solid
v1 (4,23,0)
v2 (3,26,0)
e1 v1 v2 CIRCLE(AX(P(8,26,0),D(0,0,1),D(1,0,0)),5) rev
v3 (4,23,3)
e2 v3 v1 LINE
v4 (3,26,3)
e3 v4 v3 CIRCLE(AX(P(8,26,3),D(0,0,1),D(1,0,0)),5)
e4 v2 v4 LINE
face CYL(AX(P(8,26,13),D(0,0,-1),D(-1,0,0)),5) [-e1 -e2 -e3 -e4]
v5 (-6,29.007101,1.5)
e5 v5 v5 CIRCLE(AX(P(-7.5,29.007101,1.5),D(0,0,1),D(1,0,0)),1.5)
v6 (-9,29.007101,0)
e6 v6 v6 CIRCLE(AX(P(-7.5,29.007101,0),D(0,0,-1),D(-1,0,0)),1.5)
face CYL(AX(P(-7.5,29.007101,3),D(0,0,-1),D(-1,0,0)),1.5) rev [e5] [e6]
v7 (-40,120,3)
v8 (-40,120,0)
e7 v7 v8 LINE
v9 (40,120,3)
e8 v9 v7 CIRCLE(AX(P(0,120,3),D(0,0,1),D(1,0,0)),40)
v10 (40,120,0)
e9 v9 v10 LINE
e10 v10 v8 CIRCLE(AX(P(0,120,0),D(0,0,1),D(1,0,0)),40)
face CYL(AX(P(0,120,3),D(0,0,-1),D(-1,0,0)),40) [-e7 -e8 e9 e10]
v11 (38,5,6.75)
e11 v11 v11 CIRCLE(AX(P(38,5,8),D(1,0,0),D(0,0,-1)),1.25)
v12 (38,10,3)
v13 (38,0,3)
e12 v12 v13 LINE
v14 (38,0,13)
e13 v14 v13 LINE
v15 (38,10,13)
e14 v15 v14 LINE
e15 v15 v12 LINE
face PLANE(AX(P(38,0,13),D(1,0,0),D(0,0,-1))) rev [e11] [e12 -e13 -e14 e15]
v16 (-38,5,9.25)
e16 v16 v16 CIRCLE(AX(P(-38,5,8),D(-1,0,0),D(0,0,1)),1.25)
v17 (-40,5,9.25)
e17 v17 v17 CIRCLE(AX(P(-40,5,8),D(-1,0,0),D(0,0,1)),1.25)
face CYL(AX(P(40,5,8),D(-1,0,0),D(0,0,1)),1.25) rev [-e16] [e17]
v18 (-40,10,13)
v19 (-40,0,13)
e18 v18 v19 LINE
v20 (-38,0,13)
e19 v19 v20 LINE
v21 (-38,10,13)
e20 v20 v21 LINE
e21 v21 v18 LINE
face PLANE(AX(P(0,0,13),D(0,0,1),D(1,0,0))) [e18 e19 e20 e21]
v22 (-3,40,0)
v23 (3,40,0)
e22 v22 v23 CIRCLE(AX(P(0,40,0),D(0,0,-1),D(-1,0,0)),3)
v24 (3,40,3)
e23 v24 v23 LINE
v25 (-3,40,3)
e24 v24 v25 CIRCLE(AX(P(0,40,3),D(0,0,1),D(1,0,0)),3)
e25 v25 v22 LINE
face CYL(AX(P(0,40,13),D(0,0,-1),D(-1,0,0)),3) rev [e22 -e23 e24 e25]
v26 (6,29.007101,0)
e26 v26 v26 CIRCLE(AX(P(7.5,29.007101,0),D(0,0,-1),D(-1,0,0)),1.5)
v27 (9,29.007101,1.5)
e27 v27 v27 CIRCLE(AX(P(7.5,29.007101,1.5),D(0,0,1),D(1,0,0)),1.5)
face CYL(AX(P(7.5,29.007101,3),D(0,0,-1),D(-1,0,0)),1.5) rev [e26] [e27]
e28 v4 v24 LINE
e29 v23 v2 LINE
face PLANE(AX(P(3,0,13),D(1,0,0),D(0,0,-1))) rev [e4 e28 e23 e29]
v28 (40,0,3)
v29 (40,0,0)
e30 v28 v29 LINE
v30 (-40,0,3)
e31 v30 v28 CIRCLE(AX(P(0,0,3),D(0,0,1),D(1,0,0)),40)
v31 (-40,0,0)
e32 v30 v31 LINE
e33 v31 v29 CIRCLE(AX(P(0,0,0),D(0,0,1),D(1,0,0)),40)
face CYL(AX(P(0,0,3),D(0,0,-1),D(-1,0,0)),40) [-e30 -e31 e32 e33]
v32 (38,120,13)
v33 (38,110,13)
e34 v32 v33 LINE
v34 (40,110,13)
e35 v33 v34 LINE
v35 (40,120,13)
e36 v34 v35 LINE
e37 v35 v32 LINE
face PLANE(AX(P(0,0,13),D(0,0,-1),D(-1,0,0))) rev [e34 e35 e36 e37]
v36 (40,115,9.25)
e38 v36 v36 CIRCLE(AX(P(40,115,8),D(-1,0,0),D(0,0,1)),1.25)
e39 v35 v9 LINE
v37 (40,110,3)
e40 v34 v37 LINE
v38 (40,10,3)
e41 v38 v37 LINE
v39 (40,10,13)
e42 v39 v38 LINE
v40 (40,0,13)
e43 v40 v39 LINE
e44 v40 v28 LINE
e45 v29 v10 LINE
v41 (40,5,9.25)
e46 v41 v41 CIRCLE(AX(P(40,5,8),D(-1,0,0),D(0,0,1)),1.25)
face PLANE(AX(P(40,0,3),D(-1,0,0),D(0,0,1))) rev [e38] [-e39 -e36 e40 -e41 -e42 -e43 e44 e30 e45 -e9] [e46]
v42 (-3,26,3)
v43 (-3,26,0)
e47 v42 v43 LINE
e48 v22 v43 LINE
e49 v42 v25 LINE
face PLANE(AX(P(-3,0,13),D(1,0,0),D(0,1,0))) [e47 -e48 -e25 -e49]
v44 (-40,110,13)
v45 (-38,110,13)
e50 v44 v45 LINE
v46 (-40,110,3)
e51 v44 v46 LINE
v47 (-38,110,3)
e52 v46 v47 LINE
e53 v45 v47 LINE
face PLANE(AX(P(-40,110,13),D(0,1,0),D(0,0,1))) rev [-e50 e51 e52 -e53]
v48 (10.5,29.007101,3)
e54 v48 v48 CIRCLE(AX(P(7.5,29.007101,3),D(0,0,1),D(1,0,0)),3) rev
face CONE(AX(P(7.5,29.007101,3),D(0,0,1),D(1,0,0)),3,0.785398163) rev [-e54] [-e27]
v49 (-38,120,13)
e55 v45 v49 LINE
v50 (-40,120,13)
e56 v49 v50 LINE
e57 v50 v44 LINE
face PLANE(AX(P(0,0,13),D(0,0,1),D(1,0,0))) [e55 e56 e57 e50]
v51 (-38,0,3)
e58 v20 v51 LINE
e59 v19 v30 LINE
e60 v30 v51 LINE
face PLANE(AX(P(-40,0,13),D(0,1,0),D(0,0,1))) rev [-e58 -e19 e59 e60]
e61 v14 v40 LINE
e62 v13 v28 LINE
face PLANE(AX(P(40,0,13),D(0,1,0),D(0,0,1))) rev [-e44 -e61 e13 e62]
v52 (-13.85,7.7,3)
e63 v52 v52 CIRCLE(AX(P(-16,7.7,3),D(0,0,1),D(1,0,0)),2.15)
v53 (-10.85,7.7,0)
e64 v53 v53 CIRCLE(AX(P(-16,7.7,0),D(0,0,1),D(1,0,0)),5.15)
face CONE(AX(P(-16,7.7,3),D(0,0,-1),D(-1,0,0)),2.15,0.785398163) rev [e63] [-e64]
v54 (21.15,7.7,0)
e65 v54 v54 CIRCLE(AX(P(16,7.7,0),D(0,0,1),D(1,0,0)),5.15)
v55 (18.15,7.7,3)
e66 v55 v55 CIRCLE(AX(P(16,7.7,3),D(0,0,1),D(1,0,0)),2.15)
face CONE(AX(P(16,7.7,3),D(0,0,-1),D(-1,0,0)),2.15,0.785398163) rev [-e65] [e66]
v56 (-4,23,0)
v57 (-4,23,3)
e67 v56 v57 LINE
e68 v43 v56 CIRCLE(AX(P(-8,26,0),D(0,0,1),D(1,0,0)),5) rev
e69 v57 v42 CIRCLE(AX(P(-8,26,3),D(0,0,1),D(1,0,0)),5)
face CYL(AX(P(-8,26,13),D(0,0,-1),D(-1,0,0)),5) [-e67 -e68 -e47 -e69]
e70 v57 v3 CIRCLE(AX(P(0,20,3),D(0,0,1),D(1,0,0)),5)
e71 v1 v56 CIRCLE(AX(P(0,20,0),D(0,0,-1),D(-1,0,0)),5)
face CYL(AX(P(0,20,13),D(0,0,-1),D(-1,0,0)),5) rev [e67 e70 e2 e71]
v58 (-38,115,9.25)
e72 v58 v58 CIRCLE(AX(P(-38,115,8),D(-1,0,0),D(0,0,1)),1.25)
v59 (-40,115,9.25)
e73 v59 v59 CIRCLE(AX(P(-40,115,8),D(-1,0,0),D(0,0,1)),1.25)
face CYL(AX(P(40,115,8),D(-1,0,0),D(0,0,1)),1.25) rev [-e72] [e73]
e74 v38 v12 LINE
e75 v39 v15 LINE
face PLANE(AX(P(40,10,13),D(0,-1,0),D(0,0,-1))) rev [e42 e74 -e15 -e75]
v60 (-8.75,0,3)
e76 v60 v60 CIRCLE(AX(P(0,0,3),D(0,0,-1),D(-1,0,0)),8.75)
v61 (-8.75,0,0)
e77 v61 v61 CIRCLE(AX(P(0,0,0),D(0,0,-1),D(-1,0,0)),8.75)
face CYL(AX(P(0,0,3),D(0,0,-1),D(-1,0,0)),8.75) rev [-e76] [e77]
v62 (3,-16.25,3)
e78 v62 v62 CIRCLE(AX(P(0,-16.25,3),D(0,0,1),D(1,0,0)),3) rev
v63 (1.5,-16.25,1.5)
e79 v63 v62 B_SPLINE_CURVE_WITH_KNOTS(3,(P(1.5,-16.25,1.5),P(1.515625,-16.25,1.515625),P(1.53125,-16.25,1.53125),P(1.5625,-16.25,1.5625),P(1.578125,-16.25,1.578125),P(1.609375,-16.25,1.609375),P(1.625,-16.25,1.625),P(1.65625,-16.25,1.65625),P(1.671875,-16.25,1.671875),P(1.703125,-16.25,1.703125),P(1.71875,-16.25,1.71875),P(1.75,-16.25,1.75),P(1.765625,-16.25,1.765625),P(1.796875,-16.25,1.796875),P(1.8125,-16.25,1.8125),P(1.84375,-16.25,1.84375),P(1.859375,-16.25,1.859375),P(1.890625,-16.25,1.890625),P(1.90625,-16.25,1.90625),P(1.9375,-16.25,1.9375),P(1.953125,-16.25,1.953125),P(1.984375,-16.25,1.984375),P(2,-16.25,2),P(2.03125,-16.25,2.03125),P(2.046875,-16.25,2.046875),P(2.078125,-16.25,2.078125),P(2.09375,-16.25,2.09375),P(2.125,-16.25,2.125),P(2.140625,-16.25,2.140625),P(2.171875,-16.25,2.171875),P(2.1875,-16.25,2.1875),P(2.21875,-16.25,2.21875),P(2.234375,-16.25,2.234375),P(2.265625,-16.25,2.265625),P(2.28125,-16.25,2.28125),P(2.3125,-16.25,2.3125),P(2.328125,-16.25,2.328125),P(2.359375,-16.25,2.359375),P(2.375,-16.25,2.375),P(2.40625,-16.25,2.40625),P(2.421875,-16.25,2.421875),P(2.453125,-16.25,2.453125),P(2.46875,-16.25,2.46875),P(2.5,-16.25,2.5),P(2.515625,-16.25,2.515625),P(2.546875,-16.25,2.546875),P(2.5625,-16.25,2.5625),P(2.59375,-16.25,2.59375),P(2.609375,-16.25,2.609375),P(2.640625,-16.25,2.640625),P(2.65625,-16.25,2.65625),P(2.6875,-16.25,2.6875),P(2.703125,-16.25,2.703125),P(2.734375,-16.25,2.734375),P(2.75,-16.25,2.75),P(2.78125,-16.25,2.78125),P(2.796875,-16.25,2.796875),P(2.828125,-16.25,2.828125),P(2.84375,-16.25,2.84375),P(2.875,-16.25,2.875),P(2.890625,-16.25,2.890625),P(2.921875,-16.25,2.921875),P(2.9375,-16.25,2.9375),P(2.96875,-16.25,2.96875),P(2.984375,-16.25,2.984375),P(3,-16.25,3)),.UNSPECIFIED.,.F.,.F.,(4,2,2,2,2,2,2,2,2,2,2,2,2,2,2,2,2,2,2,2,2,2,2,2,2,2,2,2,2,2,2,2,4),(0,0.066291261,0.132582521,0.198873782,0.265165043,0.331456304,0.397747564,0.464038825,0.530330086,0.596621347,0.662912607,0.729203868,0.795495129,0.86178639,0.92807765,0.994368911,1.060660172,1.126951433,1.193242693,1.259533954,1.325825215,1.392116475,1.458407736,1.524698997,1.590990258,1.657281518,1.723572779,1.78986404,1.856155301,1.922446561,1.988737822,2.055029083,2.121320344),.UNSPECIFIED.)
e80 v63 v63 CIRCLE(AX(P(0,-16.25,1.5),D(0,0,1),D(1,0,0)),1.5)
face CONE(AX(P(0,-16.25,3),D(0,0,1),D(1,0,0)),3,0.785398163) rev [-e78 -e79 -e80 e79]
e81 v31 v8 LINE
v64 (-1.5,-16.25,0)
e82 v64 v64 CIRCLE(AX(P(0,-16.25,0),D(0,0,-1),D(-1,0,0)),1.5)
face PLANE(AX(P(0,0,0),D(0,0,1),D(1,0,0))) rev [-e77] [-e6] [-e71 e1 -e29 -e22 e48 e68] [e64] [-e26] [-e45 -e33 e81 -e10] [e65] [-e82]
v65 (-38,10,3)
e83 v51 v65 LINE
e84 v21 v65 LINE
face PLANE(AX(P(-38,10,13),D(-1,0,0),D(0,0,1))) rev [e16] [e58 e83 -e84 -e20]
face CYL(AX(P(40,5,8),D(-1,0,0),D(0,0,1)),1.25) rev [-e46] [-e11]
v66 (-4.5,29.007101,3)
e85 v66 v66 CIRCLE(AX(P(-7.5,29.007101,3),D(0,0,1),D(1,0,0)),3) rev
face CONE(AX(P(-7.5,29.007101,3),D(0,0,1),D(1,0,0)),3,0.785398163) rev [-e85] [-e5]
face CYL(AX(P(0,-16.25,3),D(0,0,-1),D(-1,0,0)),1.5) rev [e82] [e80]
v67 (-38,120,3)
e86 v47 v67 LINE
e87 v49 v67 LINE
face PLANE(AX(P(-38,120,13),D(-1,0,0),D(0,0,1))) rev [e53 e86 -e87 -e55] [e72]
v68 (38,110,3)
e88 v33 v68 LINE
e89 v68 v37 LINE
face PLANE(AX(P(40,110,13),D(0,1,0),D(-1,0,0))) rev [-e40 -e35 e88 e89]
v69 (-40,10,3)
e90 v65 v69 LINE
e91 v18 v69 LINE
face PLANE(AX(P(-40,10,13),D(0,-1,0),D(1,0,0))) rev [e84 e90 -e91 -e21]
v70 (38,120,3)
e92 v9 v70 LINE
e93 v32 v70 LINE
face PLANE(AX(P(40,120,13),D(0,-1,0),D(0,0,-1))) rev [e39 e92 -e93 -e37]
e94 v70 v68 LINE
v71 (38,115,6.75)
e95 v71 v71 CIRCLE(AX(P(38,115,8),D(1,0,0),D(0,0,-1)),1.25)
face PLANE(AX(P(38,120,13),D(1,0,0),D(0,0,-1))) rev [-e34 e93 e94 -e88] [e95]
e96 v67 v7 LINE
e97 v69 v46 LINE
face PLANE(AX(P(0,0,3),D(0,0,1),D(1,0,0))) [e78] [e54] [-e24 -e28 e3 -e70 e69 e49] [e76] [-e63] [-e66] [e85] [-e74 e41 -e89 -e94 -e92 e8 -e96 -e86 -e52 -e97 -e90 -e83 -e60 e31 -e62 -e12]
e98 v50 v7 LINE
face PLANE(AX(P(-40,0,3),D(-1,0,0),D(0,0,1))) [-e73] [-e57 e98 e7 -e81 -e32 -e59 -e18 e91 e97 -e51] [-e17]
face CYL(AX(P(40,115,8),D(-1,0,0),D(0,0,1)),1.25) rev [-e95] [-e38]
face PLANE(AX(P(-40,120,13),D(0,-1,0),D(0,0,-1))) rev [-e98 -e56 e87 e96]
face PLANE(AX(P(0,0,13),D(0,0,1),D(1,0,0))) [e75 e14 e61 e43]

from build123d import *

# Parameters (mm, degrees)
SKETCH3_R           = 40
BOSS_EXTRUDE4_DEPTH = 3
SKETCH6_R           = 1.5
SKETCH6_R_2         = 8.75
CUT_EXTRUDE2_DEPTH  = 165.951508026
CHAMFER1_SIZE       = 1.5
SKETCH12_W          = 2
SKETCH12_H          = 10
BOSS_EXTRUDE7_DEPTH = 10
SKETCH13_R          = 1.25
CUT_EXTRUDE8_DEPTH  = 180.357185527
SKETCH14_R          = 2.15
CUT_EXTRUDE9_DEPTH  = 166.435788148
CHAMFER2_SIZE       = 3
CUT_EXTRUDE10_DEPTH = 166.435788148
FILLET1_R           = 5


with BuildPart() as part:
    # Sketch3 → Boss-Extrude4 (new body)
    with BuildSketch(Plane.XY):
        with BuildLine():
            ThreePointArc((40, 0), (0, 40), (-40, 0))
            Line((-40, 0), (40, 0))
        make_face()
        with BuildLine():
            Line((40, 0), (-40, 0))
            ThreePointArc((-40, 0), (0, -40), (40, 0))
        make_face()
        with BuildLine():
            Line((-40, 120), (-40, 0))
            ThreePointArc((-40, 0), (0, 40), (40, 0))
            Line((40, 0), (40, 120))
            ThreePointArc((40, 120), (0, 80), (-40, 120))
        make_face()
        with Locations((0, 120)):
            Circle(SKETCH3_R)
    extrude(amount=BOSS_EXTRUDE4_DEPTH)

    # Sketch6 → Cut-Extrude2 (cut, through all)
    with BuildSketch(Plane(origin=(0, 0, 0), x_dir=(-1, 0, 0), z_dir=(0, 0, -1))):
        with Locations((-7.5, 29.007101127)):
            Circle(SKETCH6_R)
        with Locations((7.5, 29.007101127)):
            Circle(SKETCH6_R)
        with Locations((0, -16.25)):
            Circle(SKETCH6_R)
        Circle(SKETCH6_R_2)
    extrude(amount=-CUT_EXTRUDE2_DEPTH, mode=Mode.SUBTRACT)

    # Chamfer1
    chamfer1_edges = [part.edges().sort_by_distance(p)[0] for p in [
        (-6, 29.007101127, 3),
        (1.5, -16.25, 3),
        (9, 29.007101127, 3),
    ]]
    chamfer(chamfer1_edges, length=CHAMFER1_SIZE)

    # Sketch12 → Boss-Extrude7 (add)
    with BuildSketch(Plane.XY.offset(3)):
        with Locations((39, 115)):
            Rectangle(SKETCH12_W, SKETCH12_H)
        with Locations((-39, 115)):
            Rectangle(SKETCH12_W, SKETCH12_H)
        with Locations((-39, 5)):
            Rectangle(SKETCH12_W, SKETCH12_H)
        with Locations((39, 5)):
            Rectangle(SKETCH12_W, SKETCH12_H)
    extrude(amount=BOSS_EXTRUDE7_DEPTH)

    # Sketch13 → Cut-Extrude8 (cut, through all)
    with BuildSketch(Plane.ZY.offset(40)):
        with Locations((8, 115)):
            Circle(SKETCH13_R)
        with Locations((8, 5)):
            Circle(SKETCH13_R)
    extrude(amount=-CUT_EXTRUDE8_DEPTH, mode=Mode.SUBTRACT)

    # Sketch14 → Cut-Extrude9 (cut, through all)
    with BuildSketch(Plane(origin=(0, 0, 0), x_dir=(-1, 0, 0), z_dir=(0, 0, -1))):
        with Locations((-16, 7.7)):
            Circle(SKETCH14_R)
        with Locations((16, 7.7)):
            Circle(SKETCH14_R)
    extrude(amount=-CUT_EXTRUDE9_DEPTH, mode=Mode.SUBTRACT)

    # Chamfer2
    chamfer2_edges = [part.edges().sort_by_distance(p)[0] for p in [
        (18.15, 7.7, 0),
        (-13.85, 7.7, 0),
    ]]
    chamfer(chamfer2_edges, length=CHAMFER2_SIZE - 0.0001)  # a hair under: the kernel refuses the full size

    # Sketch9 → Cut-Extrude10 (cut, through all)
    with BuildSketch(Plane(origin=(0, 0, 0), x_dir=(-1, 0, 0), z_dir=(0, 0, -1))):
        with BuildLine():
            ThreePointArc((3, 40), (0, 43), (-3, 40))
            Line((-3, 40), (-3, 24))
            ThreePointArc((-3, 24), (0, 15), (3, 24))
            Line((3, 24), (3, 40))
        make_face()
    extrude(amount=-CUT_EXTRUDE10_DEPTH, mode=Mode.SUBTRACT)

    # Fillet1
    fillet1_edges = [part.edges().sort_by_distance(p)[0] for p in [
        (3, 24, 1.5),
        (-3, 24, 1.5),
    ]]
    fillet(fillet1_edges, radius=FILLET1_R)


solid = part.part
